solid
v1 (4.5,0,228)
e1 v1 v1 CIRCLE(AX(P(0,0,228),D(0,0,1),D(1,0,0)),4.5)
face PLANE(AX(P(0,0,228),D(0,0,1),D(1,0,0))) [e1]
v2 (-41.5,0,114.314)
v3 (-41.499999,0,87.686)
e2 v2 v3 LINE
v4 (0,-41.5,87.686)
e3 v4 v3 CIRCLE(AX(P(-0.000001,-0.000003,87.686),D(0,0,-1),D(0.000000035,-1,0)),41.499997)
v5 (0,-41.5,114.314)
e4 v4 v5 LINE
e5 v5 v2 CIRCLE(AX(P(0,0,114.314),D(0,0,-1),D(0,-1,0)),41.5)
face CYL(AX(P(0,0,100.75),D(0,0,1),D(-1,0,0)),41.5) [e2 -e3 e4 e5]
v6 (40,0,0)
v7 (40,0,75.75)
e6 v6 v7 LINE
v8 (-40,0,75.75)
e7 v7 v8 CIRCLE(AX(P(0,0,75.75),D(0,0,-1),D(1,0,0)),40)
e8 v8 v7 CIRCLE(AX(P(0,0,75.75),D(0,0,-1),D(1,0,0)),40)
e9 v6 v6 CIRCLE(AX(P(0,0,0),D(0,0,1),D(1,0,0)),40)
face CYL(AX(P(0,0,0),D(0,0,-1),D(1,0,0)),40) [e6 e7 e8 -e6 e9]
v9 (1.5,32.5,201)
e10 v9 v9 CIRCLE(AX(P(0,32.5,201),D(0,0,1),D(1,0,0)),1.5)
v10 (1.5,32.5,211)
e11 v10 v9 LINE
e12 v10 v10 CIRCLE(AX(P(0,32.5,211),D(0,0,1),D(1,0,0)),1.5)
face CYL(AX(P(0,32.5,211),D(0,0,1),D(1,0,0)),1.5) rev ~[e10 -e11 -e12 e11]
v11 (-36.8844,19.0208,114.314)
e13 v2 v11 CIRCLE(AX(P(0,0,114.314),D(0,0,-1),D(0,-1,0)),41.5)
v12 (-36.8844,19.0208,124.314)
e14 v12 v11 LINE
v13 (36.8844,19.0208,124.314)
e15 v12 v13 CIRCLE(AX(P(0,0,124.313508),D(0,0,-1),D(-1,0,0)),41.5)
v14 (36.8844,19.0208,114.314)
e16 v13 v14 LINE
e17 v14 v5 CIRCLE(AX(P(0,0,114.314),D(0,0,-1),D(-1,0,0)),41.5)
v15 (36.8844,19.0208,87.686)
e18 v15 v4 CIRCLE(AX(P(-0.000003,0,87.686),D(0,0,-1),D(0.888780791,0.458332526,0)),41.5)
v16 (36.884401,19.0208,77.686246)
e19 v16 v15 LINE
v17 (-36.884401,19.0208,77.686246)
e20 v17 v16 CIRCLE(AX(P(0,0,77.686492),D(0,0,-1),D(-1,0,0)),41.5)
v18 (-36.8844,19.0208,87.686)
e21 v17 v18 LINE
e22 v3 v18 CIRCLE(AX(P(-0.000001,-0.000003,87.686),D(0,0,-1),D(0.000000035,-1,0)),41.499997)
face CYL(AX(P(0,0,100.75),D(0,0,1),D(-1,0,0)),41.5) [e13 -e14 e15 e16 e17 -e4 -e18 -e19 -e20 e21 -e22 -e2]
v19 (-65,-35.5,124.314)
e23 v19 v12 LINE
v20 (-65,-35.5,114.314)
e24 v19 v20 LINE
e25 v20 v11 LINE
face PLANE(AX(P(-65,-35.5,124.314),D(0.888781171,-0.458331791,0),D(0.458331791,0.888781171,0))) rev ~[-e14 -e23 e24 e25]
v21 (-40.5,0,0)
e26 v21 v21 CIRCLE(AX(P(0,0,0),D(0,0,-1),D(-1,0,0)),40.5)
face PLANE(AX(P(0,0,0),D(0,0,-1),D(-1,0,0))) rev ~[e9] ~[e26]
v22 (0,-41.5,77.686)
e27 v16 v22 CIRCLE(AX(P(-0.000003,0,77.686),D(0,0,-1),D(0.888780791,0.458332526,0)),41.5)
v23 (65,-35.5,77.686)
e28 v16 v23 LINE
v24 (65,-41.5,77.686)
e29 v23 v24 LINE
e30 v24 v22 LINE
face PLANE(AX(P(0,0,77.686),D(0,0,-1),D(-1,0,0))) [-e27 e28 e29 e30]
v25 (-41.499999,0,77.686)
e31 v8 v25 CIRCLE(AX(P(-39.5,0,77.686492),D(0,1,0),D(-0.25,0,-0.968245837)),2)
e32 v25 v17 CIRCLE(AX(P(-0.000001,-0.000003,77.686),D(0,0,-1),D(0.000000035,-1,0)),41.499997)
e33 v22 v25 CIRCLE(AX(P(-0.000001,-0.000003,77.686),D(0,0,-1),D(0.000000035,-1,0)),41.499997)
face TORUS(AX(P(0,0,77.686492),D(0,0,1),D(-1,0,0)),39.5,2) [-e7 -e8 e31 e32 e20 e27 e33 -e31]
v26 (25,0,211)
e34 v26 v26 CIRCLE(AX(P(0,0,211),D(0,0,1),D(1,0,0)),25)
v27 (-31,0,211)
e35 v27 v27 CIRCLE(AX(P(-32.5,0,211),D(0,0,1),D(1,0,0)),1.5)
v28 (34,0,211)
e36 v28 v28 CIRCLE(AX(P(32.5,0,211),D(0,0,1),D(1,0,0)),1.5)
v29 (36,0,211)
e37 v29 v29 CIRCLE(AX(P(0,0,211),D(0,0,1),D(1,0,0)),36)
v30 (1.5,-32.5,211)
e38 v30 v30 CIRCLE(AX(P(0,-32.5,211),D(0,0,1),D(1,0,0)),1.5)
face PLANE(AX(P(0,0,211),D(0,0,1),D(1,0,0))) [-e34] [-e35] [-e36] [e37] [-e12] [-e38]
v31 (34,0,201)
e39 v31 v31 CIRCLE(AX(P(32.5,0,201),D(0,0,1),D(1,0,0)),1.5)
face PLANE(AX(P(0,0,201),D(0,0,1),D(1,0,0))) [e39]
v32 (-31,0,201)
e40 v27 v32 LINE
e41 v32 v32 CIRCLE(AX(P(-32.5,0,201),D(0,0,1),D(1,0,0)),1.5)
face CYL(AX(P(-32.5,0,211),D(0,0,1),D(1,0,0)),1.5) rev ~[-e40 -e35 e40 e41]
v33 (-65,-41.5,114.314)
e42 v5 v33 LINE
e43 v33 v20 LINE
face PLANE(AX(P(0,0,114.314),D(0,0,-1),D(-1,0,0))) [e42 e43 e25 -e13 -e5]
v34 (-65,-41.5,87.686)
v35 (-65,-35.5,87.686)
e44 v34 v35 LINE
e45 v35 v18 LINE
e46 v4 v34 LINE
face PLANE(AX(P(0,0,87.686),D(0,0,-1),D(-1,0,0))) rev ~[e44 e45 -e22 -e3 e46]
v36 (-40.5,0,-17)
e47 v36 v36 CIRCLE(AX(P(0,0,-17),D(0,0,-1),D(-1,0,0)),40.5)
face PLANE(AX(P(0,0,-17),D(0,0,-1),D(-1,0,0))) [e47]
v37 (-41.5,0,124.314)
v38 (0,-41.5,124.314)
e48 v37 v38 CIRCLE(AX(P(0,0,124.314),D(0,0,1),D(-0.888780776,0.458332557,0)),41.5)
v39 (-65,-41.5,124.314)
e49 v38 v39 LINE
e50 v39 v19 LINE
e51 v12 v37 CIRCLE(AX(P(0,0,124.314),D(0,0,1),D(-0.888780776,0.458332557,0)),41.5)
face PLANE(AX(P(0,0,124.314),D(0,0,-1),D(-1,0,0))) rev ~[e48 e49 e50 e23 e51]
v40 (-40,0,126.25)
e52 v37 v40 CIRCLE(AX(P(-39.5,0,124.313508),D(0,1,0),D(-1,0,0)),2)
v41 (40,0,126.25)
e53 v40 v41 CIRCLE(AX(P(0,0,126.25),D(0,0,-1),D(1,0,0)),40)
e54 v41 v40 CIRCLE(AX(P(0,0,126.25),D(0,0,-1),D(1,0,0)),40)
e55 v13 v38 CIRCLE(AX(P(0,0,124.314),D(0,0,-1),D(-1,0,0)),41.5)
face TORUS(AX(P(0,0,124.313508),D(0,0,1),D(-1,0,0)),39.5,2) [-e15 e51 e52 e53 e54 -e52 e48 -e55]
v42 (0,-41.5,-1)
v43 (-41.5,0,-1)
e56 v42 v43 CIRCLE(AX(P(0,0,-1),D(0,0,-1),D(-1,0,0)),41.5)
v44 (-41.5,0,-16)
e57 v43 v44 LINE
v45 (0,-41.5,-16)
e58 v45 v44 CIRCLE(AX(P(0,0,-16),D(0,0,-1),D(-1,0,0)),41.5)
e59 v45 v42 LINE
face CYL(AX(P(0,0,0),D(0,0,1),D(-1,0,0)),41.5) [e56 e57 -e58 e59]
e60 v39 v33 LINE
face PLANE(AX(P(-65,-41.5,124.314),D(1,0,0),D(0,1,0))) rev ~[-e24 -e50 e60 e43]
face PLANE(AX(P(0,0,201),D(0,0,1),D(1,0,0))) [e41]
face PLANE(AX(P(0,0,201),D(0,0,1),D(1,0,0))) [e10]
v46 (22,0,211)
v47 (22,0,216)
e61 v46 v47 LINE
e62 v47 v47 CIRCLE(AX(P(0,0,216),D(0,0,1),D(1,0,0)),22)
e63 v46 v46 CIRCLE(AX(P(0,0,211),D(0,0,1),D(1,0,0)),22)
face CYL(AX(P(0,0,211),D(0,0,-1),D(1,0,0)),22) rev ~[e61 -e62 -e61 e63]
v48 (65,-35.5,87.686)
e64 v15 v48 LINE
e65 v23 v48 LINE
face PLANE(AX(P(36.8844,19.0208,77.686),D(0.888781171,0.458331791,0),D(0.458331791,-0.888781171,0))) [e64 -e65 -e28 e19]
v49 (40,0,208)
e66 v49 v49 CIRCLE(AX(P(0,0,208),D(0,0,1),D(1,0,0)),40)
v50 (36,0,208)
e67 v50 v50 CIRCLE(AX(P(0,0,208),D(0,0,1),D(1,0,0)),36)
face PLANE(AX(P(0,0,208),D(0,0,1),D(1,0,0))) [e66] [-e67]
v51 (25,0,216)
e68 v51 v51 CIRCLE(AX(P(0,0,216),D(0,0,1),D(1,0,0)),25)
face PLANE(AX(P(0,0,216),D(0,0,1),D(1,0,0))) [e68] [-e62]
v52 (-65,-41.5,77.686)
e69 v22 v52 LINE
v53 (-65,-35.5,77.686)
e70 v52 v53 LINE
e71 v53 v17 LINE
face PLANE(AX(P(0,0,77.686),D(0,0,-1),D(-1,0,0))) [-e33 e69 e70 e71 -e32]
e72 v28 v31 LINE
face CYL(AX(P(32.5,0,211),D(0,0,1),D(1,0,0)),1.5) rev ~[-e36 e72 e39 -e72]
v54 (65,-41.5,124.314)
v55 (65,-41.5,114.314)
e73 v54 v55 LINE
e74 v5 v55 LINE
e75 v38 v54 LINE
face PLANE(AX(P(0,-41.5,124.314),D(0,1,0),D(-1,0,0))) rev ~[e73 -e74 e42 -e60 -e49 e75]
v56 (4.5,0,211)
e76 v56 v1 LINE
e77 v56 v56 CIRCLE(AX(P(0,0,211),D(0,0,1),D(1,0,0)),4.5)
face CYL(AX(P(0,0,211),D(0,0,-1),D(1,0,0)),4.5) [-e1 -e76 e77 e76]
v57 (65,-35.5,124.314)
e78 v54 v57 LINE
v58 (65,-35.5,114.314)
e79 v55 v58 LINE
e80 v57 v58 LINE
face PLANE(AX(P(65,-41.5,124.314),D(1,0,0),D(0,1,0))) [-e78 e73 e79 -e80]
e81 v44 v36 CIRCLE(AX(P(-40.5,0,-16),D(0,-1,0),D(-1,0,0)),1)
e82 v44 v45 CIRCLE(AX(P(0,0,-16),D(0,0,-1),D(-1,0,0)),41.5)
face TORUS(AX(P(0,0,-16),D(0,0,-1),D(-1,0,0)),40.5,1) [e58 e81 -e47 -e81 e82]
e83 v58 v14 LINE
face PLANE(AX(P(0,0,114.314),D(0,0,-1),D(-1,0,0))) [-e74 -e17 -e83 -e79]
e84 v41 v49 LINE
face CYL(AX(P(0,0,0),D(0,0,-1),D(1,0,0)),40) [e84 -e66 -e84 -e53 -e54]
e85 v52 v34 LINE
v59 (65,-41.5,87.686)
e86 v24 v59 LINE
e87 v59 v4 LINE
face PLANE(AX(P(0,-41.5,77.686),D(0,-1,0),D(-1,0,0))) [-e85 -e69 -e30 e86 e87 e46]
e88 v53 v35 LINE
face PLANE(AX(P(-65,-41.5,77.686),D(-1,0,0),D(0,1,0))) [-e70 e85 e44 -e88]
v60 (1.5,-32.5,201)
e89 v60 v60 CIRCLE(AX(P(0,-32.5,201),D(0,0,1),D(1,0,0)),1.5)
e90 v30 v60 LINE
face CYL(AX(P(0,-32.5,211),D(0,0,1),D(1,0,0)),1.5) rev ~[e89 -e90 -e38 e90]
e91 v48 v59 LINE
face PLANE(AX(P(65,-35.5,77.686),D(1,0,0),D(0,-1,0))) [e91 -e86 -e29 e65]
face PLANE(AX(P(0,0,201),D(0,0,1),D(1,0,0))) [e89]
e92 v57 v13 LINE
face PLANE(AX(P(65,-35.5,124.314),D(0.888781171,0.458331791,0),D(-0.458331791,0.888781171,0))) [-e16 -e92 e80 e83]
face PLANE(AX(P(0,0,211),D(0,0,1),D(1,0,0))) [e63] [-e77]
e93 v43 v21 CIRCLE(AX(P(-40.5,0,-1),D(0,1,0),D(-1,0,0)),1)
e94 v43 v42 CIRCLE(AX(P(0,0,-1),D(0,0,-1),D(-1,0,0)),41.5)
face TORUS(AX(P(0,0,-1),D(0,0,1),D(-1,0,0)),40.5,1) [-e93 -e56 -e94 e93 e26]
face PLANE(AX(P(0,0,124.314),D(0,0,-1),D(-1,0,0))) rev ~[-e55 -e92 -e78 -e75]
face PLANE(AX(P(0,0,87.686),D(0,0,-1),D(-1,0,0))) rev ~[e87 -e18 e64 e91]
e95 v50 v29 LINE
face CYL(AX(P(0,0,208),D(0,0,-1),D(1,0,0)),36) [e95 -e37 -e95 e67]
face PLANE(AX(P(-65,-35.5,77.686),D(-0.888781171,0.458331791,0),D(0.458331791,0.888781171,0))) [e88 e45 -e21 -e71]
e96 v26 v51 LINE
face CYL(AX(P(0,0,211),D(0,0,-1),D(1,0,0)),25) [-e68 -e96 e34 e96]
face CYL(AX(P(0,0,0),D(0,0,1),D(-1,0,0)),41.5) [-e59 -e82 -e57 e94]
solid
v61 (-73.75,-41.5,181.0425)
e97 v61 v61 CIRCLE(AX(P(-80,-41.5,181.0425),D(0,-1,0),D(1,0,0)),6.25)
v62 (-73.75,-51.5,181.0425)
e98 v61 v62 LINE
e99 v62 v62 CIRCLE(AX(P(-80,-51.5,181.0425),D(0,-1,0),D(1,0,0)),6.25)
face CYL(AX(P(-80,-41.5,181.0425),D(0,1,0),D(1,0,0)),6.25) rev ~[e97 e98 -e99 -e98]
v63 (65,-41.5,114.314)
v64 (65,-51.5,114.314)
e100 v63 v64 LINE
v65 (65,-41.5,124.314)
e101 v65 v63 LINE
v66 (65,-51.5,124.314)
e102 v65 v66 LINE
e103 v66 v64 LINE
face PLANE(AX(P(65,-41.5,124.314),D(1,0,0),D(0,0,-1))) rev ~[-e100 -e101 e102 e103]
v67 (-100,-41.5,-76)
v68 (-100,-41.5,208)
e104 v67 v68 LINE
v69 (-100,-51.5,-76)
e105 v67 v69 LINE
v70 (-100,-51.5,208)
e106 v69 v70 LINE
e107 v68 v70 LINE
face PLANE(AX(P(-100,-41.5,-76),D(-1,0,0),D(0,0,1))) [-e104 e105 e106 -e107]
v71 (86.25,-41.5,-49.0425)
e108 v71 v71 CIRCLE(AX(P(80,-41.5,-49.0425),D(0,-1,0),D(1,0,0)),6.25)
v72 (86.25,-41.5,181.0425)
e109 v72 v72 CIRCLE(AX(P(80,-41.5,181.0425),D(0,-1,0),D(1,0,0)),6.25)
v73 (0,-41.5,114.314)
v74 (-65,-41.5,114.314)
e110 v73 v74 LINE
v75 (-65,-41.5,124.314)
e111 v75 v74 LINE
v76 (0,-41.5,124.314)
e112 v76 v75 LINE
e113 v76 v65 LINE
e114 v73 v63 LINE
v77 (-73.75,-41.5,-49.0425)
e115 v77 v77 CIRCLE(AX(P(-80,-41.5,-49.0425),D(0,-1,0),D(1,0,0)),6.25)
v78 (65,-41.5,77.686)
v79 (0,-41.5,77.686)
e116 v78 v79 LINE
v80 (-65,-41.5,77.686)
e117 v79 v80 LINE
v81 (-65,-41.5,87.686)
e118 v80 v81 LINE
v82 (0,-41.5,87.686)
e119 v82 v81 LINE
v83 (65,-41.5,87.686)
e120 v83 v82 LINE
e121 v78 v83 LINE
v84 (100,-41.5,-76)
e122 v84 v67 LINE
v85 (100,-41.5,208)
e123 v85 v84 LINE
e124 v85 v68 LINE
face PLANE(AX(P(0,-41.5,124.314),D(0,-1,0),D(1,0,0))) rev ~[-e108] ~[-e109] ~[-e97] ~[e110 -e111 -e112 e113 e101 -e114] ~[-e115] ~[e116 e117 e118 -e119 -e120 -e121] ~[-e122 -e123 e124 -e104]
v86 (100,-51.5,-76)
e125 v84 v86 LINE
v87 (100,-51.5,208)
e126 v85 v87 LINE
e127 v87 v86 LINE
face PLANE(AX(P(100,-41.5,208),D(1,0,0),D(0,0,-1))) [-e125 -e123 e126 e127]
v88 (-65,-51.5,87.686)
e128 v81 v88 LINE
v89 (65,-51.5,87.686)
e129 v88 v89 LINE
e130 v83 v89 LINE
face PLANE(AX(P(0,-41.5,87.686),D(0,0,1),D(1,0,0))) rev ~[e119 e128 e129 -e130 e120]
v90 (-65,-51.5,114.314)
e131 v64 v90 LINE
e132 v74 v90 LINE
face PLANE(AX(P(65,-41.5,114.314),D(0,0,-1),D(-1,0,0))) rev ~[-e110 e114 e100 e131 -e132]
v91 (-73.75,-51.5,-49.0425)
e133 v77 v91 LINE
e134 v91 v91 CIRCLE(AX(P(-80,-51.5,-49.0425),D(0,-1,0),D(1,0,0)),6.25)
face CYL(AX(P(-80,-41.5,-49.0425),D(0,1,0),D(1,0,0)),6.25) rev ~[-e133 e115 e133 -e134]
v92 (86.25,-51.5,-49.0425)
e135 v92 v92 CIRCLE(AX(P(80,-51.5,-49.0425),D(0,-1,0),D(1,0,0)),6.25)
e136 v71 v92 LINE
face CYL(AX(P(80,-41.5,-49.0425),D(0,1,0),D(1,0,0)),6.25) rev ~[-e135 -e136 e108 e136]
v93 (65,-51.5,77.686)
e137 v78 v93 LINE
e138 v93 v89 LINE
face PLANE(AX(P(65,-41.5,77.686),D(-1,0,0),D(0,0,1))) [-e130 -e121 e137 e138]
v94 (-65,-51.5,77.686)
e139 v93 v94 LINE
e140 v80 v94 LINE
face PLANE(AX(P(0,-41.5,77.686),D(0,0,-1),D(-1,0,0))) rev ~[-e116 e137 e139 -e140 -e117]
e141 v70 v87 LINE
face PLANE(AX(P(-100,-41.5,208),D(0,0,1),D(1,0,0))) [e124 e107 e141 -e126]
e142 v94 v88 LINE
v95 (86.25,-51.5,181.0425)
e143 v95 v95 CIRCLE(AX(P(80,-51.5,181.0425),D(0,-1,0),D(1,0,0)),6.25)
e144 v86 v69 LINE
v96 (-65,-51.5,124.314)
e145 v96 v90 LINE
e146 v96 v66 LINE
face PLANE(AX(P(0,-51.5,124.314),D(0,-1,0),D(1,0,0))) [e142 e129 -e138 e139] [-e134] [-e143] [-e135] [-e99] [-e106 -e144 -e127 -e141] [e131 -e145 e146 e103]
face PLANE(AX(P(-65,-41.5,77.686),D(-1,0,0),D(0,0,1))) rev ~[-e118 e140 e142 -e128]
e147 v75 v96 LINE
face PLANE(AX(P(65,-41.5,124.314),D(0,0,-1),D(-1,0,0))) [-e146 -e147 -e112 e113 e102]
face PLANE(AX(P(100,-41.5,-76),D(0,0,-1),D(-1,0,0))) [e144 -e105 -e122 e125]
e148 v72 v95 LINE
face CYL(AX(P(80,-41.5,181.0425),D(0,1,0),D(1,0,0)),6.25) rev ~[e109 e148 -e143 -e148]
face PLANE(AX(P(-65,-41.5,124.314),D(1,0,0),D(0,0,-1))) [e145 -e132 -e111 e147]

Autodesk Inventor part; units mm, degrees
ref_plane "YZ Plane" through (0, 0, 0) normal (1, 0, 0) x (0, 1, 0)
sketch "Boceto1" plane through (0, 0, 0) normal (0, 0, 1) x (1, 0, 0)
  circle A0 centre (0, 0) radius 40
  dimension "d0" = 80
extrude "Extrusión1" add sketch "Boceto1" along normal blind 208
sketch "Boceto2" plane through (0, 0, 0) normal (0, 0, -1) x (-1, 0, 0)
  circle A0 centre (0, 0) radius 41.5
  dimension "d3" = 83
extrude "Extrusión2" add sketch "Boceto2" along normal blind 17
fillet "Empalme1" radius 1 2 edges at (41.5, 0, 0) (41.5, 0, -17)
sketch "Boceto3" plane through (0, 0, 208) normal (0, 0, 1) x (1, 0, 0)
  circle A0 centre (0, 0) radius 36
  dimension "d7" = 72
extrude "Extrusión3" add sketch "Boceto3" along normal blind 3
sketch "Boceto4" plane through (0, 0, 211) normal (0, 0, 1) x (1, 0, 0)
  circle A0 centre (0, 0) radius 25
  circle A1 centre (0, 0) radius 22
  dimension "d10" = 50
  dimension "d11" = 44
extrude "Extrusión4" add sketch "Boceto4" along normal blind 5
sketch "Boceto5" plane through (0, 0, 211) normal (0, 0, 1) x (1, 0, 0)
  circle A0 centre (0, 0) radius 4.5
  dimension "d14" = 9
extrude "Extrusión5" add sketch "Boceto5" along normal blind 17
sketch "Boceto6" plane through (0, 0, 211) normal (0, 0, 1) x (1, 0, 0)
  circle A0 centre (-32.5, 0) radius 1.5
  circle A1 centre (0, 32.5) radius 1.5
  circle A2 centre (32.5, 0) radius 1.5
  circle A3 centre (0, -32.5) radius 1.5
  point P0 (0, 0)
  dimension "d17" = 3
  dimension "d18" = 3
  dimension "d19" = 3
  dimension "d20" = 3
  dimension "d21" = 65
  dimension "d22" = 65
  dimension "d23" = 32.5
  dimension "d24" = 32.5
extrude "Extrusión6" cut sketch "Boceto6" against normal blind 10
thread "Rosca1" size "M3x0.5" class "6H" standard "ISO Metric profile" length 15
thread "Rosca2" size "M3x0.5" class "6H" standard "ISO Metric profile" length 15
thread "Rosca3" size "M3x0.5" class "6H" standard "ISO Metric profile" length 15
thread "Rosca4" size "M3x0.5" class "6H" standard "ISO Metric profile" length 15
ref_plane "Plano de trabajo1" through (0, 0, 100.75) normal (0, 0, -1) x (-1, 0, 0)
sketch "Boceto7" plane through (0, 0, 100.75) normal (0, 0, -1) x (-1, 0, 0)
  circle A0 centre (0, 0) radius 40 projected
  circle A1 centre (0, 0) radius 41.5
  dimension "d37" = 83
extrude "Extrusión7" add sketch "Boceto7" along normal blind 25 and the other way blind 25.5
fillet "Empalme2" radius 2 2 edges at (41.5, 0, 126.25) (41.5, 0, 75.75)
ref_plane "Plano de trabajo2" through (0, 0, 77.686) normal (0, 0, -1) x (-1, 0, 0)
ref_plane "Plano de trabajo3" through (0, 0, 124.314) normal (0, 0, -1) x (-1, 0, 0)
sketch "Boceto8" plane through (0, 0, 124.314) normal (0, 0, -1) x (-1, 0, 0)
  circle A0 centre (0, 0) radius 41.5 projected
  line L0 (0, -41.5) -> (-65, -41.5)
  line L1 (-65, -41.5) -> (-65, -35.5)
  line L2 (-65, -35.5) -> (-36.8844, 19.0208)
  line L3 (0, -41.5) -> (65, -41.5)
  line L4 (65, -41.5) -> (65, -35.5)
  line L5 (65, -35.5) -> (36.8844, 19.0208)
  dimension "d45" = 6
  dimension "d46" = 65
  dimension "d47" = 65
  dimension "d48" = 6
extrude "Extrusión8" add sketch "Boceto8" along normal blind 10 contours A0 L5 L4 L3 | L0 L1 L2 A0
sketch "Boceto9" plane through (0, 0, 77.686) normal (0, 0, -1) x (-1, 0, 0)
  arc A0 (-36.8844, 19.0208) -> (0, -41.5) centre (0, 0) ccw projected
  line L0 (-65, -41.5) -> (0, -41.5) projected
  line L1 (-36.8844, 19.0208) -> (-65, -35.5) projected
  line L2 (-65, -35.5) -> (-65, -41.5) projected
  line L3 (65, -35.5) -> (36.8844, 19.0208) projected
  arc A1 (0, -41.5) -> (36.8844, 19.0208) centre (0, 0) ccw projected
  line L4 (0, -41.5) -> (65, -41.5) projected
  line L5 (65, -41.5) -> (65, -35.5) projected
  point P0 (0, -41.5)
  point P1 (0, -41.5)
  point P2 (0, -41.5)
  point P3 (0, -41.5)
extrude "Extrusión9" add sketch "Boceto9" against normal blind 10
sketch "Boceto10" plane through (0, -41.5, 124.314) normal (0, -1, 0) x (1, 0, 0)
  line L0 (65, 0) -> (0, 0) projected
  line L1 (0, 0) -> (0, -0.0005) projected
  line L2 (0, 0) -> (-65, 0) projected
  line L3 (-65, 0) -> (-65, -10) projected
  line L4 (0, -10) -> (-65, -10) projected
  line L5 (65, -10) -> (0, -10) projected
  line L6 (65, 0) -> (65, -10) projected
  line L7 (65, -46.628) -> (0, -46.628) projected
  line L8 (65, -46.628) -> (65, -36.628) projected
  line L9 (0, -36.628) -> (65, -36.628) projected
  line L10 (-65, -36.628) -> (0, -36.628) projected
  line L11 (-65, -46.628) -> (-65, -36.628) projected
  line L12 (0, -46.628) -> (-65, -46.628) projected
  line L13 (0, -46.628) -> (0, -46.6275) projected
  line L14 (-100, 83.686) -> (100, 83.686)
  line L15 (100, 83.686) -> (100, -200.314)
  line L16 (100, -200.314) -> (-100, -200.314)
  line L17 (-100, -200.314) -> (-100, 83.686)
  line L18 (40, 83.686) -> (-40, 83.686) projected
  circle A0 centre (-80, 56.7285) radius 6.25
  circle A1 centre (80, 56.7285) radius 6.25
  circle A2 centre (-80, -173.3565) radius 6.25
  circle A3 centre (80, -173.3565) radius 6.25
  line L19 (80, -173.3565) -> (-80, -173.3565) construction
  line L20 (-80, 56.7285) -> (-80, -173.3565) construction
  line L21 (-80, 56.7285) -> (80, 56.7285) construction
  line L22 (80, 56.7285) -> (80, -173.3565) construction
  line L23 (0, 83.686) -> (0, -200.314) construction
  line L24 (-100, -58.314) -> (100, -58.314) construction
  point P0 (0, -124.314)
  point P1 (0, 83.686)
  point P2 (0, 56.7285)
  point P3 (0, -58.314)
  point P4 (80, -58.314)
  point P5 (0, -58.314)
  dimension "d53" = 200
  dimension "d54" = 284
  dimension "d55" = 12.5
  dimension "d56" = 12.5
  dimension "d57" = 12.5
  dimension "d58" = 12.5
  dimension "d59" = 160
  dimension "d60" = 160
  dimension "d61" = 230.085
  dimension "d62" = 230.085
extrude "Extrusión10" add sketch "Boceto10" along normal blind 10
properties part number "Motor"
